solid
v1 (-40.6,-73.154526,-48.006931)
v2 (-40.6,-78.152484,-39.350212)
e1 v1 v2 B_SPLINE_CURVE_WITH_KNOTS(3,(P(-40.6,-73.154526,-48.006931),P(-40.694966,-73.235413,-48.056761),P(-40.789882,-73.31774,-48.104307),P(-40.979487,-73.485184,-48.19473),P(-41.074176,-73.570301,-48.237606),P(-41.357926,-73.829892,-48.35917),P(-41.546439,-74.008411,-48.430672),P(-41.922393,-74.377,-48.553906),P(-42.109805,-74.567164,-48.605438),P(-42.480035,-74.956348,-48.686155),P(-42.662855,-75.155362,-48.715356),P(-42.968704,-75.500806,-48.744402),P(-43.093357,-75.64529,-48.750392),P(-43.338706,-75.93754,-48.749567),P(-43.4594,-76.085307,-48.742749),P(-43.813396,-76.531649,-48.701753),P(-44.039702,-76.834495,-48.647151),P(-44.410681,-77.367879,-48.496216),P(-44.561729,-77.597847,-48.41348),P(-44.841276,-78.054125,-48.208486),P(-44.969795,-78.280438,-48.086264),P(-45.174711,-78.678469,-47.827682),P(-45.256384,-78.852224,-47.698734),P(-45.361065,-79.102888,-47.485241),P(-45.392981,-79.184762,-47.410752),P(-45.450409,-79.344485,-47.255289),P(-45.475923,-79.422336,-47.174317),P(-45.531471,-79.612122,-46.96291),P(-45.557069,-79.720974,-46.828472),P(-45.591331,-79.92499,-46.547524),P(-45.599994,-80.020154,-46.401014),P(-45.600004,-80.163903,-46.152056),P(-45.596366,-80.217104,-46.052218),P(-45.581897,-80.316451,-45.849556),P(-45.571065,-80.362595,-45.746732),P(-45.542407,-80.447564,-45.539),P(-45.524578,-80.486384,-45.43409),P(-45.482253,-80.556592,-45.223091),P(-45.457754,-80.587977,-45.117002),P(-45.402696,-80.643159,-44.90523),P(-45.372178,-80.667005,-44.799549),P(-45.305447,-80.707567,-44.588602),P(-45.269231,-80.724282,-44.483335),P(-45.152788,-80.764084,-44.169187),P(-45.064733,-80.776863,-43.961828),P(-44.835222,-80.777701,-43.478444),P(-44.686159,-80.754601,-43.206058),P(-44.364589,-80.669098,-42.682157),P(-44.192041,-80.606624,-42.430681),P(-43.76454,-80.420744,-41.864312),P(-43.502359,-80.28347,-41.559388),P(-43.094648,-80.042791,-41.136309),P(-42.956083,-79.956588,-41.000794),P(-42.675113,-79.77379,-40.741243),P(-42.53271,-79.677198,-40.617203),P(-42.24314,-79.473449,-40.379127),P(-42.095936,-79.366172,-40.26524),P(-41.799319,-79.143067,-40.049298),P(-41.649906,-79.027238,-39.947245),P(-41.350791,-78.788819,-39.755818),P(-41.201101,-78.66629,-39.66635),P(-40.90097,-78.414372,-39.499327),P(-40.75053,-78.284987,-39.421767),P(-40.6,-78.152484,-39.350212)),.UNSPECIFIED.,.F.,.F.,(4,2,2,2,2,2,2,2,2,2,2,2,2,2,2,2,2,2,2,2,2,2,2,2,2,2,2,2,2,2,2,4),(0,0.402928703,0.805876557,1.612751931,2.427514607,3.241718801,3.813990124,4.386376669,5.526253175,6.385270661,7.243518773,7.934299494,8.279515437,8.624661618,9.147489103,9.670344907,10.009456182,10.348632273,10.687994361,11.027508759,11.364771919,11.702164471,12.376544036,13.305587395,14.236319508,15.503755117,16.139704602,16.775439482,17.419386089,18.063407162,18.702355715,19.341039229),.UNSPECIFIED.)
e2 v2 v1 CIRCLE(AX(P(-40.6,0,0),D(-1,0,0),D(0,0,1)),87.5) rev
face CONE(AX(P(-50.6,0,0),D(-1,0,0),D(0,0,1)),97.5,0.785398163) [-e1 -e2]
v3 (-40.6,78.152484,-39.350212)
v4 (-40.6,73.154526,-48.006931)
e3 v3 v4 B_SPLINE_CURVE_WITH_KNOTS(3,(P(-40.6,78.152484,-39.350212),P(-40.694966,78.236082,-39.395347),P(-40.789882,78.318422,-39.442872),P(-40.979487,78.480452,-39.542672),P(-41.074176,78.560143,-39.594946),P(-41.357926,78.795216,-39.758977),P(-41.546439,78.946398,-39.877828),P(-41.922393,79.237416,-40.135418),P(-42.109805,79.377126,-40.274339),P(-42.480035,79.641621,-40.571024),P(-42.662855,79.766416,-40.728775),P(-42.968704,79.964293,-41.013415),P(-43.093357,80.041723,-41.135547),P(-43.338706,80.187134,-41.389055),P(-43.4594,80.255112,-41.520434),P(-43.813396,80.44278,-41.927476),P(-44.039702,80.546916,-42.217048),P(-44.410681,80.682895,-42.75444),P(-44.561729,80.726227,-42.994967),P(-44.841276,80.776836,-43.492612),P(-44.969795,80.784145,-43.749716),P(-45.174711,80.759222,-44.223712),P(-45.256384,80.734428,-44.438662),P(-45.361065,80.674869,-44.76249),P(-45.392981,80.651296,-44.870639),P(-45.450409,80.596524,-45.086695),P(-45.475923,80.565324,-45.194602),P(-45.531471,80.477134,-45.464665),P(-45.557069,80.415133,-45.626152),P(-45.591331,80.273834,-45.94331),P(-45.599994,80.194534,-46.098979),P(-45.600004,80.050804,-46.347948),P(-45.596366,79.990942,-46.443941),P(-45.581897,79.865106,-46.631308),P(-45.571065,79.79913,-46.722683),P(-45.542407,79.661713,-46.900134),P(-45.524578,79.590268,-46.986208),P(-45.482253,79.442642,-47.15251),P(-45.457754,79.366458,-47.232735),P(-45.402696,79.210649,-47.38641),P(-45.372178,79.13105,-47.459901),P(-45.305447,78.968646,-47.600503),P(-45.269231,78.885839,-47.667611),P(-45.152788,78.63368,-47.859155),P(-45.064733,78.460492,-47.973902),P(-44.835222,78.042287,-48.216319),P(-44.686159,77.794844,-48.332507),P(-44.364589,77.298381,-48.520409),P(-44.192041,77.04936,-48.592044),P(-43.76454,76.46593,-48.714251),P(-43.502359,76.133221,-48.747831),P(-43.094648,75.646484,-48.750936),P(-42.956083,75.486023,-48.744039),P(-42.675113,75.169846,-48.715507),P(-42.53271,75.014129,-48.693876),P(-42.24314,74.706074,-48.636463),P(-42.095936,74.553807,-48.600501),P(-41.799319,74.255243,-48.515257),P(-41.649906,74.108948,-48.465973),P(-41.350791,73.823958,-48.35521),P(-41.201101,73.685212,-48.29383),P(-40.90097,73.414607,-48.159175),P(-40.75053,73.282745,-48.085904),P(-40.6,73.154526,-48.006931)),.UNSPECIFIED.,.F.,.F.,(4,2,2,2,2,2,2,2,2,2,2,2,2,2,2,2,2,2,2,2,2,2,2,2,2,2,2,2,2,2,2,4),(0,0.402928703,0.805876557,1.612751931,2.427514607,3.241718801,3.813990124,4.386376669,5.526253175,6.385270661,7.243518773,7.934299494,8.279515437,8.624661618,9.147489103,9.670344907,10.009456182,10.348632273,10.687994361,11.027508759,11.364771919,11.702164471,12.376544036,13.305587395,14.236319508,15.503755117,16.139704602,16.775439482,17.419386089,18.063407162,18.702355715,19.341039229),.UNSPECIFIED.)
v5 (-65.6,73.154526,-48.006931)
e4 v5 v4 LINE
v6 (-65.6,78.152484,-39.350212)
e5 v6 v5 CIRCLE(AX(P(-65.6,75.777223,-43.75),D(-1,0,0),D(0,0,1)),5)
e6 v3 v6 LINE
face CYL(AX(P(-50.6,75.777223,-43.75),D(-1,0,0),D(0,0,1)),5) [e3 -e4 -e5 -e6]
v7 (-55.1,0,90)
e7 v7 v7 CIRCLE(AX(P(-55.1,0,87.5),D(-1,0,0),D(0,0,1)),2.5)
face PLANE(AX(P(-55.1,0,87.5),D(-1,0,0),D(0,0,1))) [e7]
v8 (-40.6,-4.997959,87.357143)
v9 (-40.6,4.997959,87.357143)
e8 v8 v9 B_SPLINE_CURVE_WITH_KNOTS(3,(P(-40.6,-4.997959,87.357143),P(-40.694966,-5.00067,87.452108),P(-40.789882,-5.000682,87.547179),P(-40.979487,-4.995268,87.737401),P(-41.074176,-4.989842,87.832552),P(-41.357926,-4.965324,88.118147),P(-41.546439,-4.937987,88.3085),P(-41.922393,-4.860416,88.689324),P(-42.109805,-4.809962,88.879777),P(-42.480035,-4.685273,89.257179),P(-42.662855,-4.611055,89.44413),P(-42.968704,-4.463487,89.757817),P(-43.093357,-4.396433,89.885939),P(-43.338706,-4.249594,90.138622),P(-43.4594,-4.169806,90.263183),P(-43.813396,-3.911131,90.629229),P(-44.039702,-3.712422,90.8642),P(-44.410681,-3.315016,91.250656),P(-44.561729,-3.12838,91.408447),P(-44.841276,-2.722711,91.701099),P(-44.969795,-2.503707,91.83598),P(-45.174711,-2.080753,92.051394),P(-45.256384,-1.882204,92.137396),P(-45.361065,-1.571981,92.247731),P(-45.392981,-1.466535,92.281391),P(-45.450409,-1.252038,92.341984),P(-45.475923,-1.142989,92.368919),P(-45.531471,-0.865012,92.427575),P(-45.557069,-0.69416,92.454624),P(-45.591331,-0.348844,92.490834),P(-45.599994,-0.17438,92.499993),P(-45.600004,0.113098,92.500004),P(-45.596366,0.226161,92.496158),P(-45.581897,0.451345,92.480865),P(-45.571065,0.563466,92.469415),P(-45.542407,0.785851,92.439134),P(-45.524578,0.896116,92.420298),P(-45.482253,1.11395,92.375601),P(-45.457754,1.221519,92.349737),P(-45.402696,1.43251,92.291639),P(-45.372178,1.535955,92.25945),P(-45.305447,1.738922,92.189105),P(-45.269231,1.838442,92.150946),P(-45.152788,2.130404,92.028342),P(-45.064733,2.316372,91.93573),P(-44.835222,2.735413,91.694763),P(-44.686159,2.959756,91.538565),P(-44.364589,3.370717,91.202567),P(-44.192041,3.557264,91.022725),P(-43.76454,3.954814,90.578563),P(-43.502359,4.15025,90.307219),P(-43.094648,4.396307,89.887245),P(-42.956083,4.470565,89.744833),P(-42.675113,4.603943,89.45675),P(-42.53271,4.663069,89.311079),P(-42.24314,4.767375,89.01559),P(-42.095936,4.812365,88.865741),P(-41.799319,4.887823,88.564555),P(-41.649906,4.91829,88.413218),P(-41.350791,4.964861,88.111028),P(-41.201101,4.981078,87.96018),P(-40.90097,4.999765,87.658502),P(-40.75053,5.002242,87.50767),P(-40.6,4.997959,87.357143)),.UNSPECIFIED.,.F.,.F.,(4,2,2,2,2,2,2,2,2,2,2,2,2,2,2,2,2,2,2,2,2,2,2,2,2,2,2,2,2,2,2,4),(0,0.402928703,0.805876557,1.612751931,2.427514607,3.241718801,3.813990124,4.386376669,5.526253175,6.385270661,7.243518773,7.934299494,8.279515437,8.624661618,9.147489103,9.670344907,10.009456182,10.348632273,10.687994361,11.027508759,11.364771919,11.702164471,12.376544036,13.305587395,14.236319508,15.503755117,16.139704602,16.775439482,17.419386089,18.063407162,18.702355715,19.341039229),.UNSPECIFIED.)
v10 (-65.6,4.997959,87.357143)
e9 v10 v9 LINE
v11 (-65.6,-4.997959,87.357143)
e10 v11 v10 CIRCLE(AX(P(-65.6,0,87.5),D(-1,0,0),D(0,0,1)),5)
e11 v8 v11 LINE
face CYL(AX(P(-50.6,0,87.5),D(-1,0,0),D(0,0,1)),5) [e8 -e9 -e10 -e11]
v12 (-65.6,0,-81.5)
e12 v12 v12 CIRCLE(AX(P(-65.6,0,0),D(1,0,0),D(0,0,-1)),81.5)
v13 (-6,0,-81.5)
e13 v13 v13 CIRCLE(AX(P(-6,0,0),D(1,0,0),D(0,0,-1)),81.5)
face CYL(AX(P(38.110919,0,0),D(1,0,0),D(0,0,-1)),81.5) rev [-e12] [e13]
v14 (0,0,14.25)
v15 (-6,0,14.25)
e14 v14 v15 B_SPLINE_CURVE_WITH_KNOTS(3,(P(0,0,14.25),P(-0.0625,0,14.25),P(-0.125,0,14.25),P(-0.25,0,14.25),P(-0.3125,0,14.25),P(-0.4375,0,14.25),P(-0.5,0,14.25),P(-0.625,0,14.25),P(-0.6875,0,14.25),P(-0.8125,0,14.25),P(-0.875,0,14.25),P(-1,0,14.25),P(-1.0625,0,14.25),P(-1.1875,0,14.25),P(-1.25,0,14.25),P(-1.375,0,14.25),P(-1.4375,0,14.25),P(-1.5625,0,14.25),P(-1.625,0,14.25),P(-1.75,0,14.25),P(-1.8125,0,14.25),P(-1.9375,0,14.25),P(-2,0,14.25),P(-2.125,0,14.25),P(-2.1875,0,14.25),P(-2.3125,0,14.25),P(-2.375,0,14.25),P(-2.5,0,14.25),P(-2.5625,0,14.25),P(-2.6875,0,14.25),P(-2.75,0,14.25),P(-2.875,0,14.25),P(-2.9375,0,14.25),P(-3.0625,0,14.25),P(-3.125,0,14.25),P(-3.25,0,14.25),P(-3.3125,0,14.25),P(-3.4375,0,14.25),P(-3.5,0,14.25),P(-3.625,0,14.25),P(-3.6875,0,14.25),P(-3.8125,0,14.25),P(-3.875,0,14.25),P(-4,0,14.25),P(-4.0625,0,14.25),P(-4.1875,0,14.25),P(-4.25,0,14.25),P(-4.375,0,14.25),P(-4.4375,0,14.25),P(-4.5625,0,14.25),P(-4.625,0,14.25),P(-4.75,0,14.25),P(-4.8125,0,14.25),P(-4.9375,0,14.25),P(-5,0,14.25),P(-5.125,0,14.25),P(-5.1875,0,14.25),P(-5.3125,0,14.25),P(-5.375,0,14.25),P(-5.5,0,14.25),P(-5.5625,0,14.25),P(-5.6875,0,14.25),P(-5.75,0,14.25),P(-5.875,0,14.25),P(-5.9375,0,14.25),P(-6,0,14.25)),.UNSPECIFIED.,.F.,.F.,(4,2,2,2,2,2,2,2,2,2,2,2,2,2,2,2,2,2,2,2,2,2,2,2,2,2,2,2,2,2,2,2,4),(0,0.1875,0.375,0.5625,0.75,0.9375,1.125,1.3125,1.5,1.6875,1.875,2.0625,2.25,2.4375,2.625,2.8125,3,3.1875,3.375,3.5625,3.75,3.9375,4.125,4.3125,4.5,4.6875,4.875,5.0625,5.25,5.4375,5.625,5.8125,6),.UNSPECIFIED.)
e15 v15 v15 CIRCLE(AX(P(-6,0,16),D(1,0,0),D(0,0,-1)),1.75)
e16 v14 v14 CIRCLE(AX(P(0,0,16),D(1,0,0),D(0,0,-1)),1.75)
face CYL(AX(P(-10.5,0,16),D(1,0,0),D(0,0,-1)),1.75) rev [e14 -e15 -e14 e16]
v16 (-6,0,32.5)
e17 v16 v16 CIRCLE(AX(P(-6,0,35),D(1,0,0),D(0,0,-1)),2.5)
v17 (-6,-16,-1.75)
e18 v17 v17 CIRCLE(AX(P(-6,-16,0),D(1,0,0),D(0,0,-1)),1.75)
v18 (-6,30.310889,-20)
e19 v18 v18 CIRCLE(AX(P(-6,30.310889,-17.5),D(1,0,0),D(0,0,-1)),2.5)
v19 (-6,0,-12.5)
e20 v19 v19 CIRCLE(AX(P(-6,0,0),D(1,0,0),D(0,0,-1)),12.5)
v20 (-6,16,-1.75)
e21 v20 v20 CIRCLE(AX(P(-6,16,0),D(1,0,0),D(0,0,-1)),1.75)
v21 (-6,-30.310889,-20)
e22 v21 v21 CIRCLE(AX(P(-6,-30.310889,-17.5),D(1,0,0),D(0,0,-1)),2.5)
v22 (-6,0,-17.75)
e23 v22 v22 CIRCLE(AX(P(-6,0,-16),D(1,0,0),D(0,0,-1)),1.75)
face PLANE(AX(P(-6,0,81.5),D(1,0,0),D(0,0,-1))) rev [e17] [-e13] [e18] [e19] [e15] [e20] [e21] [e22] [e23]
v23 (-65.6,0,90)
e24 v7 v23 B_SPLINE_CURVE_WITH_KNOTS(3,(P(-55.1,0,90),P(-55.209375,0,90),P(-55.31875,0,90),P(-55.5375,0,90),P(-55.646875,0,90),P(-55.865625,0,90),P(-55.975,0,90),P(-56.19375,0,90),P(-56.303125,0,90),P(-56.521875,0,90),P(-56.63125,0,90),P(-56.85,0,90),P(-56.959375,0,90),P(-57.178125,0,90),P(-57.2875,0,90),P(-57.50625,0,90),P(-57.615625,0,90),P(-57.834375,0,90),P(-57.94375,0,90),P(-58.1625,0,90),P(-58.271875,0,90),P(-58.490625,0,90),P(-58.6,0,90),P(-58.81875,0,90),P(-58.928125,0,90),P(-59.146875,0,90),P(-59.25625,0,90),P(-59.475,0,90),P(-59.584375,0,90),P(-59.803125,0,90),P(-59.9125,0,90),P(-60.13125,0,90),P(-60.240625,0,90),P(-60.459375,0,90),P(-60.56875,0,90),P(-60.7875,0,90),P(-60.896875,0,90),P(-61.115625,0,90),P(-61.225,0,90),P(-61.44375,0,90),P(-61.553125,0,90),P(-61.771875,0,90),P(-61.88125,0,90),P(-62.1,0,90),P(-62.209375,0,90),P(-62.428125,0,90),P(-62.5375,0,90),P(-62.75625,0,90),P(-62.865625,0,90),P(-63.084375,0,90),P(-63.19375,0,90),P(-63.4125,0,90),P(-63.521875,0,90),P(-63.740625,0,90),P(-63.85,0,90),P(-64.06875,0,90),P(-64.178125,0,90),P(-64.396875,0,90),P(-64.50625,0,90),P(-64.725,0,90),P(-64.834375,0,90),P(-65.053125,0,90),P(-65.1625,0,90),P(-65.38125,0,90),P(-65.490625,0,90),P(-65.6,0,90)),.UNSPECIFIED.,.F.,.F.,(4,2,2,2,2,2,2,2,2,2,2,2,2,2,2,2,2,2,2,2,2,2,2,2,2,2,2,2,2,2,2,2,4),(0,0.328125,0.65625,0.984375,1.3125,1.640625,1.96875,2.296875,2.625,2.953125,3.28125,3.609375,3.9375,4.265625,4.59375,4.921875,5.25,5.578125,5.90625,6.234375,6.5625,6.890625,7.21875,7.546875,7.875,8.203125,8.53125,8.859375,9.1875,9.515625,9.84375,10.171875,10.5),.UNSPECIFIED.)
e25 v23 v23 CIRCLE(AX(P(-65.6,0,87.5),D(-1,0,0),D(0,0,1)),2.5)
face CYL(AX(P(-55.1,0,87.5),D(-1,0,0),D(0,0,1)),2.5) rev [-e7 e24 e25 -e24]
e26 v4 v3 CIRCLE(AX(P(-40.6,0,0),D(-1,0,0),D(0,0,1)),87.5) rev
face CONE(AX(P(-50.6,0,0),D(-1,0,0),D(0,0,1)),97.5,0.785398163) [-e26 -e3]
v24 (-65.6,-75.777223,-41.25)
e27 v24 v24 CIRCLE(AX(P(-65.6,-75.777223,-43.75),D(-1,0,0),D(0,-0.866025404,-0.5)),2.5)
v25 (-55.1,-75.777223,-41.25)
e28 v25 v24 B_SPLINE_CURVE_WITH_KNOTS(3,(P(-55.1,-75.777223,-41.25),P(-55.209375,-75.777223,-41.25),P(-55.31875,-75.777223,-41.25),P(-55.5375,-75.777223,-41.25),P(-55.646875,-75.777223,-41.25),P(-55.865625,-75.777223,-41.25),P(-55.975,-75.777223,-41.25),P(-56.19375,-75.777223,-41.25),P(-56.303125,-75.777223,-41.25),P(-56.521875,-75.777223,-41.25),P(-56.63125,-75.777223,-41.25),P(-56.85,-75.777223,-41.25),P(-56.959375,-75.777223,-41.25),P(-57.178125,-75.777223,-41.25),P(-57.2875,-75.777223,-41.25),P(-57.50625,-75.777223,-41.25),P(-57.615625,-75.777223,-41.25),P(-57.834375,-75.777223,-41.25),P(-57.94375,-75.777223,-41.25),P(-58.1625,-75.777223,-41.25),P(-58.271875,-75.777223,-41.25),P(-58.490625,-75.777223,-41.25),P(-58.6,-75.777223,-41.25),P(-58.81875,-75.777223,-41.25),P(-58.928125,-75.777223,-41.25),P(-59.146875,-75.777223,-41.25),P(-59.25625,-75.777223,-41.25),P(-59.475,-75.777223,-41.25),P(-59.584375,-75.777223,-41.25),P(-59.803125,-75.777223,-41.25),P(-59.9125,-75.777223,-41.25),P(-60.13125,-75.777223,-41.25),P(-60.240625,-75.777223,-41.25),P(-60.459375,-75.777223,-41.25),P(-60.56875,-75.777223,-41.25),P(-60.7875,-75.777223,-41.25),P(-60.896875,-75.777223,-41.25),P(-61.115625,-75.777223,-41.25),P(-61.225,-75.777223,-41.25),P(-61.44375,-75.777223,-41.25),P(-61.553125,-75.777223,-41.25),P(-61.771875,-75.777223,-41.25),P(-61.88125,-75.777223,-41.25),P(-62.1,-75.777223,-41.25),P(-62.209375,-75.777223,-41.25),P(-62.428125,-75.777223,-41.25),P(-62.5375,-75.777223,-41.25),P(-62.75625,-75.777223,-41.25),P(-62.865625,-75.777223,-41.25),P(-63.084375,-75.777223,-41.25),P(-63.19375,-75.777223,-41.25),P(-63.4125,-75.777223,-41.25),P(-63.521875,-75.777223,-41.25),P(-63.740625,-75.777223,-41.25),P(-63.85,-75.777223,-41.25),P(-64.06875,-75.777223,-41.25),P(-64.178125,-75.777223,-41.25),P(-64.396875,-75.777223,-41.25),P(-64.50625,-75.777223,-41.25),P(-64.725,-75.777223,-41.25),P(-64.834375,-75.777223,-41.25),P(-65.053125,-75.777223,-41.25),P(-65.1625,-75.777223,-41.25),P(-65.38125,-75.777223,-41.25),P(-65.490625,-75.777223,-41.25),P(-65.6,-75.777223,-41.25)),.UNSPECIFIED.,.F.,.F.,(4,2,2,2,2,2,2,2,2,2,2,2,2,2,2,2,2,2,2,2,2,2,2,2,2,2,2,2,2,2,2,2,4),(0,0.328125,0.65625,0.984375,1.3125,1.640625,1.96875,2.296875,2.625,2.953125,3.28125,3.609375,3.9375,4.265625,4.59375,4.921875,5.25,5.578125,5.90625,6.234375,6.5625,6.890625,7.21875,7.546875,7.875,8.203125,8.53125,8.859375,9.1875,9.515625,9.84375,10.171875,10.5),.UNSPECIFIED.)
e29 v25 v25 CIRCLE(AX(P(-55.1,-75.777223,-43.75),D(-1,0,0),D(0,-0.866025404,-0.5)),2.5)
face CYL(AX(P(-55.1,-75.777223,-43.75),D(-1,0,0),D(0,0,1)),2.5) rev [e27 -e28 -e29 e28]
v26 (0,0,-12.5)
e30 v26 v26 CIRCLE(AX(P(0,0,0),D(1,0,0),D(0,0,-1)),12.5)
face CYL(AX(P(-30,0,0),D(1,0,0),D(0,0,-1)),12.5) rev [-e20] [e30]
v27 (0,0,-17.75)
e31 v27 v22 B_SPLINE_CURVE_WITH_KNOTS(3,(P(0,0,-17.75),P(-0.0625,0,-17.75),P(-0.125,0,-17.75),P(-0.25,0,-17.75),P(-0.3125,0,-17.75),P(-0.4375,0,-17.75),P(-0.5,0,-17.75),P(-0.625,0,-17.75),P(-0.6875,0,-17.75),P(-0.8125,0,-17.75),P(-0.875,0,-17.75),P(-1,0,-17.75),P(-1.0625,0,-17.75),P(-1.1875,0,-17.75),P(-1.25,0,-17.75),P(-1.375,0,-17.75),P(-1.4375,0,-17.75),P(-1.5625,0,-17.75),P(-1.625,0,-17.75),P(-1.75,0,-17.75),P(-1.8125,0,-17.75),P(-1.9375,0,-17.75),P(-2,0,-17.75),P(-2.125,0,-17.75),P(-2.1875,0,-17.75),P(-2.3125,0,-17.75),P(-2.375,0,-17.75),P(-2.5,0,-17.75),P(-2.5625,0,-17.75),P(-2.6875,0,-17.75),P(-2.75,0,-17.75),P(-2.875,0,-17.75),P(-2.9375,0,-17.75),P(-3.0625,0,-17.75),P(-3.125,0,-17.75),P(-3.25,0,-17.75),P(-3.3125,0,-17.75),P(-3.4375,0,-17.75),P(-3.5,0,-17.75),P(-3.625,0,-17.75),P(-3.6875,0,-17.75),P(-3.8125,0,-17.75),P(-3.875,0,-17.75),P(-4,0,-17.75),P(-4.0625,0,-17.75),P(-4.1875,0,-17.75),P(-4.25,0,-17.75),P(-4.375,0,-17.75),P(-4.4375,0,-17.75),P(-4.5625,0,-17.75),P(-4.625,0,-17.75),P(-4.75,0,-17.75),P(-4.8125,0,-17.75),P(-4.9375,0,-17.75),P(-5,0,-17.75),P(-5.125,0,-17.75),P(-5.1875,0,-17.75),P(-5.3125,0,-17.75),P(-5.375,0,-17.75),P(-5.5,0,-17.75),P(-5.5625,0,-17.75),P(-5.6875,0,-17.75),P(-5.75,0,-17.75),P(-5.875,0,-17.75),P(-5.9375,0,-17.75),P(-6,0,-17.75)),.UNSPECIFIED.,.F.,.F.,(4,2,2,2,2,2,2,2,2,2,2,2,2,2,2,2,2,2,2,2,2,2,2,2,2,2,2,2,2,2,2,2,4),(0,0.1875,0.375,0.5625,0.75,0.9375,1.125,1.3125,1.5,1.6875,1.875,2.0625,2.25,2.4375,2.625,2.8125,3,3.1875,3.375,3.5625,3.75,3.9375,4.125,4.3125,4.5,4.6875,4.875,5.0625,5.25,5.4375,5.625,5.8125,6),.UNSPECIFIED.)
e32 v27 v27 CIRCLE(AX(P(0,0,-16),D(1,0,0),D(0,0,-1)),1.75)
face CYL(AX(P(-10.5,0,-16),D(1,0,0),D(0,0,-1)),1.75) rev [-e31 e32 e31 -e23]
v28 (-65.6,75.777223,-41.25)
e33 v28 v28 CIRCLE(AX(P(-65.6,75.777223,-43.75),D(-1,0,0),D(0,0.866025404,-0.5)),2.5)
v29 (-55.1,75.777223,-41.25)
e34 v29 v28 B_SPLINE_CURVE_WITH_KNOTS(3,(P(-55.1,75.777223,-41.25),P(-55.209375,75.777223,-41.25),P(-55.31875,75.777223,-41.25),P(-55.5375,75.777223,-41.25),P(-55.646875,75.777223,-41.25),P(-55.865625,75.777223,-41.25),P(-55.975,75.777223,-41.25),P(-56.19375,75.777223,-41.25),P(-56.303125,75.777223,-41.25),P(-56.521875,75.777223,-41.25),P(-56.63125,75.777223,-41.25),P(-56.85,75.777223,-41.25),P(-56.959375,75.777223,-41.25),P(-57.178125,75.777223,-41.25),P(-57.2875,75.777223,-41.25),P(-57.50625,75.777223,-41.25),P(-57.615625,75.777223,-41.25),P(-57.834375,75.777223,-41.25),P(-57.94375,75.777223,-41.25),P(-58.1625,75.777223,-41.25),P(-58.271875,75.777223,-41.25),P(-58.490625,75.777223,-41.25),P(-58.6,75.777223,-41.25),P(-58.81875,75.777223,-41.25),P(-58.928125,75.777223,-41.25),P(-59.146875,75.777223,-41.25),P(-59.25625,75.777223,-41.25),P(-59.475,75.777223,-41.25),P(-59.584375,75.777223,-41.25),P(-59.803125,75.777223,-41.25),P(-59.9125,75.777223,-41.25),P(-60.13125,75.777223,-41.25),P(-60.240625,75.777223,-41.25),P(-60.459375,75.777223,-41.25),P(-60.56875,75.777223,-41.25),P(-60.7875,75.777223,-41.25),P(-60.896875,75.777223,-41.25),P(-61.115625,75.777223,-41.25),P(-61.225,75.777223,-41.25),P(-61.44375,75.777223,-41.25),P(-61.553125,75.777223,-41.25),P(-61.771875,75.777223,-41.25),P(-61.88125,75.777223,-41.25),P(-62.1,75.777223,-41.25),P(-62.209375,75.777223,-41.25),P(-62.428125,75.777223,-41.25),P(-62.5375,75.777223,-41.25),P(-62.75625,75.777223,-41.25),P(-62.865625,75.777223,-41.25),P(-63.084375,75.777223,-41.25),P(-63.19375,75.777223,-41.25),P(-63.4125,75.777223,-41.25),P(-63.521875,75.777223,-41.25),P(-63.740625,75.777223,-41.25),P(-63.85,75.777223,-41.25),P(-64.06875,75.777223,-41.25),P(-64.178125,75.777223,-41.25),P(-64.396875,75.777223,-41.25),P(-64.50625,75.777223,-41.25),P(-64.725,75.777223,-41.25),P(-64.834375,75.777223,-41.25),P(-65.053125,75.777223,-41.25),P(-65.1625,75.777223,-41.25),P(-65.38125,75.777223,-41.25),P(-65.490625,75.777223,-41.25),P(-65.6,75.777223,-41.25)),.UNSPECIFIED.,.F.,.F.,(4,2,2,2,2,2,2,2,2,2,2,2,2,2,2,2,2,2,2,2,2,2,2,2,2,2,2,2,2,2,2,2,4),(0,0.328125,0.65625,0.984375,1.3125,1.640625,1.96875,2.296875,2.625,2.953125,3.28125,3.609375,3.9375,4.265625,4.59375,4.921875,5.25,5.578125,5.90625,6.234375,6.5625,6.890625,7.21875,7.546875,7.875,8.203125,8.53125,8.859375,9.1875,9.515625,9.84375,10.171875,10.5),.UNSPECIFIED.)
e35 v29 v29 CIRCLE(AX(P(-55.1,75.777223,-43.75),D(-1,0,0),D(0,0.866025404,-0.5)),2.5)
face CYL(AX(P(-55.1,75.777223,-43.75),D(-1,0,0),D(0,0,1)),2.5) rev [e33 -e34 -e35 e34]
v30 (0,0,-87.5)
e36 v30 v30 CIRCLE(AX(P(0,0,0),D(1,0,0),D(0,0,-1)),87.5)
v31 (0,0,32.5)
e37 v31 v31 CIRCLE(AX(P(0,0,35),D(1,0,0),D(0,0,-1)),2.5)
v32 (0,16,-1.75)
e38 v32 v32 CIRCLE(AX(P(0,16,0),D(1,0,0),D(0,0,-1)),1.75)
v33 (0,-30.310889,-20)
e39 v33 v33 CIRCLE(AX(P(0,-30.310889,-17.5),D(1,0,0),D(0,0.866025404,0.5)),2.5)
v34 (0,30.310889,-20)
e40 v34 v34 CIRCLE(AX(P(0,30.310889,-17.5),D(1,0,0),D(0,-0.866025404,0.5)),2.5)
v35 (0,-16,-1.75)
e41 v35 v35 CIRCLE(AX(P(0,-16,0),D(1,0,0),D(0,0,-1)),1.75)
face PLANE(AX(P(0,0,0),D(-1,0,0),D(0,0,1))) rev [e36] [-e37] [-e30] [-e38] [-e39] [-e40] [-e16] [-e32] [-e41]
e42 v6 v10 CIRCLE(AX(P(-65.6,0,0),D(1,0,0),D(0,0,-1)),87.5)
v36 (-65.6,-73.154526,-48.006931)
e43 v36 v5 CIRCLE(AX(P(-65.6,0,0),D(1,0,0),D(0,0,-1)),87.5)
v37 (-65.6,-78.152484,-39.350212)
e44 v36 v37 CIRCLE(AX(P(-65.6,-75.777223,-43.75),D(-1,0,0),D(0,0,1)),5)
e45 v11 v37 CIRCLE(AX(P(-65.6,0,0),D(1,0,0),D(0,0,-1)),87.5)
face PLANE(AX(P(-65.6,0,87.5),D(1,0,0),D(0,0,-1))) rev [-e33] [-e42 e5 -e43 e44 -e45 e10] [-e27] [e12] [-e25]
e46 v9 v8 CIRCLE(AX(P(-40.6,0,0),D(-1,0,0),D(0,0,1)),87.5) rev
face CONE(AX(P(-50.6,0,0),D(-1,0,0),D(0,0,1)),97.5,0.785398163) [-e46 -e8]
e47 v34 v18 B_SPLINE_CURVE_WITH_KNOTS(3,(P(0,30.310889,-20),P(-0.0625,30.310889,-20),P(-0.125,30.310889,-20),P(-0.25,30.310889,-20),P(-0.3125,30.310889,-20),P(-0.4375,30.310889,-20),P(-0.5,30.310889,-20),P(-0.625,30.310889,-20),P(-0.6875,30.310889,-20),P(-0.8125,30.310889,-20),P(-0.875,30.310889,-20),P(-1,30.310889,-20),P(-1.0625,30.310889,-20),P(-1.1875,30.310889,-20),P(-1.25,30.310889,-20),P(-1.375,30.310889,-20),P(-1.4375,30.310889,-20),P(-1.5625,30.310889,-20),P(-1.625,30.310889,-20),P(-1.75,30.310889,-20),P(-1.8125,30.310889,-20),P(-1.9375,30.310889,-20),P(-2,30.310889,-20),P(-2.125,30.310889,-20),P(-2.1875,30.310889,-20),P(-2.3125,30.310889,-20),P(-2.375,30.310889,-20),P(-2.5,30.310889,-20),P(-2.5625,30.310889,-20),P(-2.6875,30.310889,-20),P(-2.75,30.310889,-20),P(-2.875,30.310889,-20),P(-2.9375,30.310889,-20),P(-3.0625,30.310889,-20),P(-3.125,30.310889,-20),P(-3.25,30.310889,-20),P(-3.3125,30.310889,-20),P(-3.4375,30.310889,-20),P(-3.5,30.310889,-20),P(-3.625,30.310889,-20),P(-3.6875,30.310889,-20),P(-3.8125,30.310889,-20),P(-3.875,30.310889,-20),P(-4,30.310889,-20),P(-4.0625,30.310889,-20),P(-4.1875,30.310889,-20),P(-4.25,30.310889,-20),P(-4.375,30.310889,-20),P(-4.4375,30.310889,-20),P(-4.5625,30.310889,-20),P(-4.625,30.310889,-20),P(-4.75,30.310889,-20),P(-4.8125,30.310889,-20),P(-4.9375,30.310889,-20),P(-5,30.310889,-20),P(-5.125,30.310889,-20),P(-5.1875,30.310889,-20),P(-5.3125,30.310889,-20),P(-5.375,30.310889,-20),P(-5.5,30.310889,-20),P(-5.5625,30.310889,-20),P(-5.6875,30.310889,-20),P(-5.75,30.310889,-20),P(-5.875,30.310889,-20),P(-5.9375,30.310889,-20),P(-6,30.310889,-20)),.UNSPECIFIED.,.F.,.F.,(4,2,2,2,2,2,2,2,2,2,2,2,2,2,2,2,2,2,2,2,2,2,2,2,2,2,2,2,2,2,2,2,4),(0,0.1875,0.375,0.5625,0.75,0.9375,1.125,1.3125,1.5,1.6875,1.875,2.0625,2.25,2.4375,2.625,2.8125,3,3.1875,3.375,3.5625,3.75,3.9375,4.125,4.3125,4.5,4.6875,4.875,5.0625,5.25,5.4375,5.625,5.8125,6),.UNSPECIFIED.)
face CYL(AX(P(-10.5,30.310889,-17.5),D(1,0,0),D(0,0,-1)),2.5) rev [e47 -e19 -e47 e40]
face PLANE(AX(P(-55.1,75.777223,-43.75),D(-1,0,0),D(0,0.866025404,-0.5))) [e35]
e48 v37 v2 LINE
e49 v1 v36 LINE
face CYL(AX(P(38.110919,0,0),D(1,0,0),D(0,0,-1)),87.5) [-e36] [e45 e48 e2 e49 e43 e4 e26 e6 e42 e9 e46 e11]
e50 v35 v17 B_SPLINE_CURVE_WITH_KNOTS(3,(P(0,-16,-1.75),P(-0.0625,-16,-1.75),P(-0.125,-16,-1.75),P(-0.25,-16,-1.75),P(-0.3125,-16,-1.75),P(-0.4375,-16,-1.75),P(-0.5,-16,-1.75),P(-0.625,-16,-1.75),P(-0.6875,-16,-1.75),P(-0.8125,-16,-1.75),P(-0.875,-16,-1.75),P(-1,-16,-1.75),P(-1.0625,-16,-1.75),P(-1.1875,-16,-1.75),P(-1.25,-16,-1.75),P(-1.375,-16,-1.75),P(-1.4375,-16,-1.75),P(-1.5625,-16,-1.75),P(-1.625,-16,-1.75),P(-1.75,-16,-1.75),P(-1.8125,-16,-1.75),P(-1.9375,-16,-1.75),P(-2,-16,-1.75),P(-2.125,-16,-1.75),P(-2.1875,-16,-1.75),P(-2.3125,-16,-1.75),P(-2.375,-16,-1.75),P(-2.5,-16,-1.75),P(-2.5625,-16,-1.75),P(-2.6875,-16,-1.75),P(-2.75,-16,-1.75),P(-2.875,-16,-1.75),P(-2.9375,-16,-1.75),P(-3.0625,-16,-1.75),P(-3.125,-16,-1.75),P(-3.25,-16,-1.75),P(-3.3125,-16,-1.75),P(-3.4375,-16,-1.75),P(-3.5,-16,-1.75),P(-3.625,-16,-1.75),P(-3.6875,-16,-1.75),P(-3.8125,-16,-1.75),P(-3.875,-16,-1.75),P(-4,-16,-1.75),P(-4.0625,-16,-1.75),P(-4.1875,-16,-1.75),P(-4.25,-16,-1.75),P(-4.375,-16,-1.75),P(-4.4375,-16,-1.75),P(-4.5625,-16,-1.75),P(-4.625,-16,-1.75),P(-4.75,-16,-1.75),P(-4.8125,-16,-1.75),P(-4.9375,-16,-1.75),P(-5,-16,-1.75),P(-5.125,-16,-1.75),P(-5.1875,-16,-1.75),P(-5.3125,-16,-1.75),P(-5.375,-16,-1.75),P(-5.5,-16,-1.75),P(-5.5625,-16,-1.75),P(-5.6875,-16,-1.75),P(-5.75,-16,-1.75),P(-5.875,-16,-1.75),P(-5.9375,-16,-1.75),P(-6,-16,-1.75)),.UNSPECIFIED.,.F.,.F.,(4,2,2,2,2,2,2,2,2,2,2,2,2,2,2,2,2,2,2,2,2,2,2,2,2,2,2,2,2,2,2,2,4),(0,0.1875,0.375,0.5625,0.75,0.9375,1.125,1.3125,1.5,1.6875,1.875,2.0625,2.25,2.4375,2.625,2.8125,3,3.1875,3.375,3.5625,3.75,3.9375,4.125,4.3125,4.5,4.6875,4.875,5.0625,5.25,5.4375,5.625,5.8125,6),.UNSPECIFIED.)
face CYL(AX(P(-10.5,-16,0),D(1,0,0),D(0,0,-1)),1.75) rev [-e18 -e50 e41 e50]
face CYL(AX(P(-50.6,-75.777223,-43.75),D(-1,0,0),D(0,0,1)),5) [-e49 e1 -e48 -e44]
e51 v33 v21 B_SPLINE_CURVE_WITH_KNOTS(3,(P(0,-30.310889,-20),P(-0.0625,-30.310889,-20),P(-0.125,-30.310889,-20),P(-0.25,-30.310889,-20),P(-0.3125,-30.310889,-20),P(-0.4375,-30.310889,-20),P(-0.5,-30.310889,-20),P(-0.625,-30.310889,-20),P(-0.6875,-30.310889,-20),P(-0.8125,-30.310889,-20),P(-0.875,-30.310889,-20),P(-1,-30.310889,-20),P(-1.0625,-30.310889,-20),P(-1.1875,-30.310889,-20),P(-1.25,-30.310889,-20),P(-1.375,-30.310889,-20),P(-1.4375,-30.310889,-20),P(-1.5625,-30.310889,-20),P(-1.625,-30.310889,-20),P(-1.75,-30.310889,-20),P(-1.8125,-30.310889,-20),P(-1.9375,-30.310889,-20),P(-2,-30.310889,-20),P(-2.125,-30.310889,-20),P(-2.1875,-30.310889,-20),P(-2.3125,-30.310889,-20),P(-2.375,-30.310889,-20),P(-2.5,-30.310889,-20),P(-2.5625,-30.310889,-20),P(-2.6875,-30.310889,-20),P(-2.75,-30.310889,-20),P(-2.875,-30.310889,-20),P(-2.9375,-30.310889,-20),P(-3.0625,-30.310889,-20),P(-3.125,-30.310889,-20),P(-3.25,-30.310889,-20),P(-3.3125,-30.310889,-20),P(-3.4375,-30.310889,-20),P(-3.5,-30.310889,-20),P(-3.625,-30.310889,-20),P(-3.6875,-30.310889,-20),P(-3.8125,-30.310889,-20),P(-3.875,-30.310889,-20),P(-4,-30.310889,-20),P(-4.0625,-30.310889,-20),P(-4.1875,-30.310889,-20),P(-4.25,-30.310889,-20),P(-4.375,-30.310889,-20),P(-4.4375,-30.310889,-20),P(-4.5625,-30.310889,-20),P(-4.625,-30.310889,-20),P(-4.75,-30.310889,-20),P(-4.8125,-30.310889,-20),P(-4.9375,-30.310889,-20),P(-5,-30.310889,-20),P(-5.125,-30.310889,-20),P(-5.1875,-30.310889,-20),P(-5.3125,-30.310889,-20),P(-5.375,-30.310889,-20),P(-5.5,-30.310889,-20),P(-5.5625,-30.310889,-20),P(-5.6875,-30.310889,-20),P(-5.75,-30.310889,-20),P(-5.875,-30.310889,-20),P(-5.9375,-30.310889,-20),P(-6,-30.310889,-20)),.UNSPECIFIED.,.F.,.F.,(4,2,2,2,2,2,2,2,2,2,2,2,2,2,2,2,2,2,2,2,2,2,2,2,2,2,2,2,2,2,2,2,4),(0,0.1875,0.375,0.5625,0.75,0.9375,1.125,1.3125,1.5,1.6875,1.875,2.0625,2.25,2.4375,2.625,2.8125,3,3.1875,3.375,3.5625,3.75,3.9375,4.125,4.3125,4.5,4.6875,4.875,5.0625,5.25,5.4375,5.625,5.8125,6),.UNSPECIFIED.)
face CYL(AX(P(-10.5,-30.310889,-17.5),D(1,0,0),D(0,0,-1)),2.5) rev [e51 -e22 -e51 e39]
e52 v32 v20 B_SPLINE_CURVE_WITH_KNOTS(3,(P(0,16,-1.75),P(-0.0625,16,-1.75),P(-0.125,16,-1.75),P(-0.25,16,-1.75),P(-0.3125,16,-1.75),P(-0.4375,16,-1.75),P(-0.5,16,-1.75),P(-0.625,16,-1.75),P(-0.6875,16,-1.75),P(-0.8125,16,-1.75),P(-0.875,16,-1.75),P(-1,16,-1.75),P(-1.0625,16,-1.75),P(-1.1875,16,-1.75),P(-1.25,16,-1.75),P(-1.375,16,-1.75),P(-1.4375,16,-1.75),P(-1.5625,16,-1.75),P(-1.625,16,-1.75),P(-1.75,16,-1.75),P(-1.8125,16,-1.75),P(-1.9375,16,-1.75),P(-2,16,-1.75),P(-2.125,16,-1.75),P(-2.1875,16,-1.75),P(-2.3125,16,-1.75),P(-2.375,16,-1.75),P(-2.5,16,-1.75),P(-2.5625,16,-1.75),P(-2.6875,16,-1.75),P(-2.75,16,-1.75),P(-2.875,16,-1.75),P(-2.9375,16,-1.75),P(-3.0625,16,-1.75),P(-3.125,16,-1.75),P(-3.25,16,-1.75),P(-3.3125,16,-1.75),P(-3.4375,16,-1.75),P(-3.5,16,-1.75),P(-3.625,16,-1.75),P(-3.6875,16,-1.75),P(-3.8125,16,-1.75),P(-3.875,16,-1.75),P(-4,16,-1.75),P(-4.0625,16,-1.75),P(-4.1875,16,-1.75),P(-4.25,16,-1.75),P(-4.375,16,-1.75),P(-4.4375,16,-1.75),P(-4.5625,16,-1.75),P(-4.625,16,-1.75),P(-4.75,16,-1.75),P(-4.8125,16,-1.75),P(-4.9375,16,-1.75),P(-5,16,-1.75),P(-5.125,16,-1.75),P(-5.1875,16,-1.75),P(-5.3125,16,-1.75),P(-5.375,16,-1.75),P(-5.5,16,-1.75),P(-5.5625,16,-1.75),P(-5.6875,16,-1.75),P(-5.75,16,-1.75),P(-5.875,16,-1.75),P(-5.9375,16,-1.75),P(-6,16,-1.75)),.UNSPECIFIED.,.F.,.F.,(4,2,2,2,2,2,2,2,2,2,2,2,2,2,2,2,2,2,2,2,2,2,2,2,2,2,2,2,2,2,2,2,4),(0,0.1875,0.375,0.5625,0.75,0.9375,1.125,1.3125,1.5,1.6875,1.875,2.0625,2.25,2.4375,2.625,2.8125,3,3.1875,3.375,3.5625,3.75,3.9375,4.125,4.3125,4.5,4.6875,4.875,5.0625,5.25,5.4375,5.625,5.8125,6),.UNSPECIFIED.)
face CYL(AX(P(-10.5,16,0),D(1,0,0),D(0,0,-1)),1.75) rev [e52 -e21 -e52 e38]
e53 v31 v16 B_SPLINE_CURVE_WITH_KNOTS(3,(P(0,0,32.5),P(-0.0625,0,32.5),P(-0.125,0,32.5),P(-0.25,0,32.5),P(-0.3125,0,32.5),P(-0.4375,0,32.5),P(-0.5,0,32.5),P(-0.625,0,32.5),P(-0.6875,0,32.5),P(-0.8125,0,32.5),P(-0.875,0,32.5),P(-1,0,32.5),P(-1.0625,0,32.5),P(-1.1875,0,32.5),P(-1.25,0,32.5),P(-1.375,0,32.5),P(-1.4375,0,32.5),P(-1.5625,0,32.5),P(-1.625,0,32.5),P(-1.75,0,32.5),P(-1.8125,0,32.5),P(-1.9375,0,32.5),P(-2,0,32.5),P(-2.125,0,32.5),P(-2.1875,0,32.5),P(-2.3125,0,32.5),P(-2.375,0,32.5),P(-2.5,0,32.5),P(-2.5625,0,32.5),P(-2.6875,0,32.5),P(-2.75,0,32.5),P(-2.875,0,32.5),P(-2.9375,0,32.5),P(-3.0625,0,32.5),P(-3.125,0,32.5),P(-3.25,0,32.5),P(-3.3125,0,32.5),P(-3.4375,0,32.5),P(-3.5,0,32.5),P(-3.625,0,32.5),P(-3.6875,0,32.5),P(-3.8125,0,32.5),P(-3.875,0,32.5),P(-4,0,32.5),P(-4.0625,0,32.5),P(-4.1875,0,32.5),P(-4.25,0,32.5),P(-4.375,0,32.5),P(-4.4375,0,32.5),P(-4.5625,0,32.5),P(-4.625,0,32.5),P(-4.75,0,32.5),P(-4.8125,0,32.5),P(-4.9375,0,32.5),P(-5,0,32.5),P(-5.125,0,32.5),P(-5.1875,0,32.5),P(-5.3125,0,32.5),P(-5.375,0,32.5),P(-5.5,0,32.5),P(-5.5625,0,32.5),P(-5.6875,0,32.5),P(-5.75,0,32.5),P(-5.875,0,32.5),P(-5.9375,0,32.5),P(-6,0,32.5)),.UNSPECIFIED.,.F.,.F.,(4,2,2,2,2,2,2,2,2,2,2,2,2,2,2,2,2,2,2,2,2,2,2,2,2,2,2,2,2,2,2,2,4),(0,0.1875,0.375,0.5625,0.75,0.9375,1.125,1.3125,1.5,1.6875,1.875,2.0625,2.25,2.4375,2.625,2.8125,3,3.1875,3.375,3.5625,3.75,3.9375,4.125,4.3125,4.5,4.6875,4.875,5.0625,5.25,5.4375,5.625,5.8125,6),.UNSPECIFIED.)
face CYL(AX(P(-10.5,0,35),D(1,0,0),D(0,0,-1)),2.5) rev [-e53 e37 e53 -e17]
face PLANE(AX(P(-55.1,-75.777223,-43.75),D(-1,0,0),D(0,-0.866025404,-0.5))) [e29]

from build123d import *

# Parameters (mm, degrees)
SKETCH3_R           = 12.5
CUT_EXTRUDE2_DEPTH  = 30
SKETCH4_R           = 5
BOSS_EXTRUDE1_DEPTH = 15
SKETCH5_R           = 2.5
CUT_EXTRUDE3_DEPTH  = 10.5
CIRPATTERN1_COUNT   = 3
CHAMFER1_SIZE       = 10
CHAMFER2_SIZE       = 10
CHAMFER3_SIZE       = 10
SKETCH6_R           = 1.75
CUT_EXTRUDE4_DEPTH  = 10.5
SKETCH7_R           = 2.5
CUT_EXTRUDE5_DEPTH  = 10.5
CIRPATTERN2_COUNT   = 3


with BuildPart() as part:
    # Sketch1 → Revolve1 (revolve)
    with BuildSketch(Plane(origin=(0, 0, 0), x_dir=(-1, 0, 0), z_dir=(0, 1, 0)), mode=Mode.PRIVATE) as revolve1_sk:
        Polygon((0, 0), (0, 87.5), (65.6, 87.5), (65.6, 81.5), (6, 81.5), (6, 0), align=None)
    revolve(revolve1_sk.sketch.rotate(Axis((38.11091851, 0, 0), (-1, 0, 0)), 180), axis=Axis((38.11091851, 0, 0), (-1, 0, 0)))

    # Sketch3 → Cut-Extrude2 (cut)
    with BuildSketch(Plane.YZ):
        with Locations(Location((0, 0, 0), (0, 0, 270))):
            Circle(SKETCH3_R)
    extrude(amount=-CUT_EXTRUDE2_DEPTH, mode=Mode.SUBTRACT)

    # Sketch4 → Boss-Extrude1 (add)
    with BuildSketch(Plane(origin=(-65.6, 0, 0), x_dir=(0, -1, 0), z_dir=(-1, 0, 0))):
        with Locations((0, 87.5)):
            Circle(SKETCH4_R)
        with Locations((-75.777222831, -43.75)):
            Circle(SKETCH4_R)
        with Locations((75.777222831, -43.75)):
            Circle(SKETCH4_R)
    extrude(amount=-BOSS_EXTRUDE1_DEPTH)

    # Sketch5 → Cut-Extrude3 (cut)
    with BuildSketch(Plane(origin=(-65.6, 0, 0), x_dir=(0, -1, 0), z_dir=(-1, 0, 0))):
        with Locations(Location((0, 87.5, 0), (0, 0, 90))):
            Circle(SKETCH5_R)
    cut_extrude3 = extrude(amount=-CUT_EXTRUDE3_DEPTH, mode=Mode.SUBTRACT)

    # CirPattern1: Cut-Extrude3 ×3 about axis
    cirpattern1_axis = Axis((0, 0, 0), (1, 0, 0))
    for i in range(1, CIRPATTERN1_COUNT):
        add(cut_extrude3.rotate(cirpattern1_axis, i * 360 / CIRPATTERN1_COUNT), mode=Mode.SUBTRACT)

    # Chamfer1
    # the kernel refuses this chamfer: 10 mm, written as the material it adds along each edge
    with BuildSketch(Plane(origin=(-50.6, 0, 0), x_dir=(0, 0.9851517122975438, -0.17168606162766187), z_dir=(0, 0.17168606162766187, 0.9851517122975438))) as chamfer1_piece_1_section:
        Polygon((87.5, -CHAMFER1_SIZE), (87.5 + CHAMFER1_SIZE, 0), (87.5, 0), align=None)
    chamfer1_piece_1 = revolve(axis=Axis((-50.6, 0, 0), (-1, 0, 0)), revolution_arc=40.228270546, mode=Mode.PRIVATE)
    chamfer1_piece_1 = chamfer1_piece_1 & Plane(origin=(-46.494939835, 75.777222831, -43.75), x_dir=(0, -1, 0), z_dir=(-1, 0, 0)) * Cylinder(5, 390, mode=Mode.PRIVATE)
    add(chamfer1_piece_1)

    # Chamfer2
    # the kernel refuses this chamfer: 10 mm, written as the material it adds along each edge
    with BuildSketch(Plane(origin=(-50.6, 0, 0), x_dir=(0, -0.3438913653035208, 0.9390094402452408), z_dir=(0, -0.9390094402452408, -0.3438913653035208))) as chamfer2_piece_1_section:
        Polygon((87.5, -CHAMFER2_SIZE), (87.5 + CHAMFER2_SIZE, 0), (87.5, 0), align=None)
    chamfer2_piece_1 = revolve(axis=Axis((-50.6, 0, 0), (-1, 0, 0)), revolution_arc=40.228270546, mode=Mode.PRIVATE)
    chamfer2_piece_1 = chamfer2_piece_1 & Plane(origin=(-46.494939444, 0, 87.5), x_dir=(0, -1, 0), z_dir=(-1, 0, 0)) * Cylinder(5, 390, mode=Mode.PRIVATE)
    add(chamfer2_piece_1)

    # Chamfer3
    # the kernel refuses this chamfer: 10 mm, written as the material it adds along each edge
    with BuildSketch(Plane(origin=(-50.6, 0, 0), x_dir=(0, -0.6412603469940208, -0.7673233786175866), z_dir=(0, 0.7673233786175866, -0.6412603469940208))) as chamfer3_piece_1_section:
        Polygon((87.5, -CHAMFER3_SIZE), (87.5 + CHAMFER3_SIZE, 0), (87.5, 0), align=None)
    chamfer3_piece_1 = revolve(axis=Axis((-50.6, 0, 0), (-1, 0, 0)), revolution_arc=40.228270546, mode=Mode.PRIVATE)
    chamfer3_piece_1 = chamfer3_piece_1 & Plane(origin=(-46.494939164, -75.777222831, -43.75), x_dir=(0, -1, 0), z_dir=(-1, 0, 0)) * Cylinder(5, 390, mode=Mode.PRIVATE)
    add(chamfer3_piece_1)

    # Sketch6 → Cut-Extrude4 (cut)
    with BuildSketch(Plane.YZ):
        with Locations(Location((-16, 0, 0), (0, 0, 270))):
            Circle(SKETCH6_R)
        with Locations(Location((16, 0, 0), (0, 0, 270))):
            Circle(SKETCH6_R)
        with Locations(Location((0, 16, 0), (0, 0, 270))):
            Circle(SKETCH6_R)
        with Locations(Location((0, -16, 0), (0, 0, 270))):
            Circle(SKETCH6_R)
    extrude(amount=-CUT_EXTRUDE4_DEPTH, mode=Mode.SUBTRACT)

    # Sketch7 → Cut-Extrude5 (cut)
    with BuildSketch(Plane.YZ):
        with Locations(Location((0, 35, 0), (0, 0, 270))):
            Circle(SKETCH7_R)
    cut_extrude5 = extrude(amount=-CUT_EXTRUDE5_DEPTH, mode=Mode.SUBTRACT)

    # CirPattern2: Cut-Extrude5 ×3 about axis
    cirpattern2_axis = Axis((0, 0, 0), (1, 0, 0))
    for i in range(1, CIRPATTERN2_COUNT):
        add(cut_extrude5.rotate(cirpattern2_axis, i * 360 / CIRPATTERN2_COUNT), mode=Mode.SUBTRACT)


solid = part.part
